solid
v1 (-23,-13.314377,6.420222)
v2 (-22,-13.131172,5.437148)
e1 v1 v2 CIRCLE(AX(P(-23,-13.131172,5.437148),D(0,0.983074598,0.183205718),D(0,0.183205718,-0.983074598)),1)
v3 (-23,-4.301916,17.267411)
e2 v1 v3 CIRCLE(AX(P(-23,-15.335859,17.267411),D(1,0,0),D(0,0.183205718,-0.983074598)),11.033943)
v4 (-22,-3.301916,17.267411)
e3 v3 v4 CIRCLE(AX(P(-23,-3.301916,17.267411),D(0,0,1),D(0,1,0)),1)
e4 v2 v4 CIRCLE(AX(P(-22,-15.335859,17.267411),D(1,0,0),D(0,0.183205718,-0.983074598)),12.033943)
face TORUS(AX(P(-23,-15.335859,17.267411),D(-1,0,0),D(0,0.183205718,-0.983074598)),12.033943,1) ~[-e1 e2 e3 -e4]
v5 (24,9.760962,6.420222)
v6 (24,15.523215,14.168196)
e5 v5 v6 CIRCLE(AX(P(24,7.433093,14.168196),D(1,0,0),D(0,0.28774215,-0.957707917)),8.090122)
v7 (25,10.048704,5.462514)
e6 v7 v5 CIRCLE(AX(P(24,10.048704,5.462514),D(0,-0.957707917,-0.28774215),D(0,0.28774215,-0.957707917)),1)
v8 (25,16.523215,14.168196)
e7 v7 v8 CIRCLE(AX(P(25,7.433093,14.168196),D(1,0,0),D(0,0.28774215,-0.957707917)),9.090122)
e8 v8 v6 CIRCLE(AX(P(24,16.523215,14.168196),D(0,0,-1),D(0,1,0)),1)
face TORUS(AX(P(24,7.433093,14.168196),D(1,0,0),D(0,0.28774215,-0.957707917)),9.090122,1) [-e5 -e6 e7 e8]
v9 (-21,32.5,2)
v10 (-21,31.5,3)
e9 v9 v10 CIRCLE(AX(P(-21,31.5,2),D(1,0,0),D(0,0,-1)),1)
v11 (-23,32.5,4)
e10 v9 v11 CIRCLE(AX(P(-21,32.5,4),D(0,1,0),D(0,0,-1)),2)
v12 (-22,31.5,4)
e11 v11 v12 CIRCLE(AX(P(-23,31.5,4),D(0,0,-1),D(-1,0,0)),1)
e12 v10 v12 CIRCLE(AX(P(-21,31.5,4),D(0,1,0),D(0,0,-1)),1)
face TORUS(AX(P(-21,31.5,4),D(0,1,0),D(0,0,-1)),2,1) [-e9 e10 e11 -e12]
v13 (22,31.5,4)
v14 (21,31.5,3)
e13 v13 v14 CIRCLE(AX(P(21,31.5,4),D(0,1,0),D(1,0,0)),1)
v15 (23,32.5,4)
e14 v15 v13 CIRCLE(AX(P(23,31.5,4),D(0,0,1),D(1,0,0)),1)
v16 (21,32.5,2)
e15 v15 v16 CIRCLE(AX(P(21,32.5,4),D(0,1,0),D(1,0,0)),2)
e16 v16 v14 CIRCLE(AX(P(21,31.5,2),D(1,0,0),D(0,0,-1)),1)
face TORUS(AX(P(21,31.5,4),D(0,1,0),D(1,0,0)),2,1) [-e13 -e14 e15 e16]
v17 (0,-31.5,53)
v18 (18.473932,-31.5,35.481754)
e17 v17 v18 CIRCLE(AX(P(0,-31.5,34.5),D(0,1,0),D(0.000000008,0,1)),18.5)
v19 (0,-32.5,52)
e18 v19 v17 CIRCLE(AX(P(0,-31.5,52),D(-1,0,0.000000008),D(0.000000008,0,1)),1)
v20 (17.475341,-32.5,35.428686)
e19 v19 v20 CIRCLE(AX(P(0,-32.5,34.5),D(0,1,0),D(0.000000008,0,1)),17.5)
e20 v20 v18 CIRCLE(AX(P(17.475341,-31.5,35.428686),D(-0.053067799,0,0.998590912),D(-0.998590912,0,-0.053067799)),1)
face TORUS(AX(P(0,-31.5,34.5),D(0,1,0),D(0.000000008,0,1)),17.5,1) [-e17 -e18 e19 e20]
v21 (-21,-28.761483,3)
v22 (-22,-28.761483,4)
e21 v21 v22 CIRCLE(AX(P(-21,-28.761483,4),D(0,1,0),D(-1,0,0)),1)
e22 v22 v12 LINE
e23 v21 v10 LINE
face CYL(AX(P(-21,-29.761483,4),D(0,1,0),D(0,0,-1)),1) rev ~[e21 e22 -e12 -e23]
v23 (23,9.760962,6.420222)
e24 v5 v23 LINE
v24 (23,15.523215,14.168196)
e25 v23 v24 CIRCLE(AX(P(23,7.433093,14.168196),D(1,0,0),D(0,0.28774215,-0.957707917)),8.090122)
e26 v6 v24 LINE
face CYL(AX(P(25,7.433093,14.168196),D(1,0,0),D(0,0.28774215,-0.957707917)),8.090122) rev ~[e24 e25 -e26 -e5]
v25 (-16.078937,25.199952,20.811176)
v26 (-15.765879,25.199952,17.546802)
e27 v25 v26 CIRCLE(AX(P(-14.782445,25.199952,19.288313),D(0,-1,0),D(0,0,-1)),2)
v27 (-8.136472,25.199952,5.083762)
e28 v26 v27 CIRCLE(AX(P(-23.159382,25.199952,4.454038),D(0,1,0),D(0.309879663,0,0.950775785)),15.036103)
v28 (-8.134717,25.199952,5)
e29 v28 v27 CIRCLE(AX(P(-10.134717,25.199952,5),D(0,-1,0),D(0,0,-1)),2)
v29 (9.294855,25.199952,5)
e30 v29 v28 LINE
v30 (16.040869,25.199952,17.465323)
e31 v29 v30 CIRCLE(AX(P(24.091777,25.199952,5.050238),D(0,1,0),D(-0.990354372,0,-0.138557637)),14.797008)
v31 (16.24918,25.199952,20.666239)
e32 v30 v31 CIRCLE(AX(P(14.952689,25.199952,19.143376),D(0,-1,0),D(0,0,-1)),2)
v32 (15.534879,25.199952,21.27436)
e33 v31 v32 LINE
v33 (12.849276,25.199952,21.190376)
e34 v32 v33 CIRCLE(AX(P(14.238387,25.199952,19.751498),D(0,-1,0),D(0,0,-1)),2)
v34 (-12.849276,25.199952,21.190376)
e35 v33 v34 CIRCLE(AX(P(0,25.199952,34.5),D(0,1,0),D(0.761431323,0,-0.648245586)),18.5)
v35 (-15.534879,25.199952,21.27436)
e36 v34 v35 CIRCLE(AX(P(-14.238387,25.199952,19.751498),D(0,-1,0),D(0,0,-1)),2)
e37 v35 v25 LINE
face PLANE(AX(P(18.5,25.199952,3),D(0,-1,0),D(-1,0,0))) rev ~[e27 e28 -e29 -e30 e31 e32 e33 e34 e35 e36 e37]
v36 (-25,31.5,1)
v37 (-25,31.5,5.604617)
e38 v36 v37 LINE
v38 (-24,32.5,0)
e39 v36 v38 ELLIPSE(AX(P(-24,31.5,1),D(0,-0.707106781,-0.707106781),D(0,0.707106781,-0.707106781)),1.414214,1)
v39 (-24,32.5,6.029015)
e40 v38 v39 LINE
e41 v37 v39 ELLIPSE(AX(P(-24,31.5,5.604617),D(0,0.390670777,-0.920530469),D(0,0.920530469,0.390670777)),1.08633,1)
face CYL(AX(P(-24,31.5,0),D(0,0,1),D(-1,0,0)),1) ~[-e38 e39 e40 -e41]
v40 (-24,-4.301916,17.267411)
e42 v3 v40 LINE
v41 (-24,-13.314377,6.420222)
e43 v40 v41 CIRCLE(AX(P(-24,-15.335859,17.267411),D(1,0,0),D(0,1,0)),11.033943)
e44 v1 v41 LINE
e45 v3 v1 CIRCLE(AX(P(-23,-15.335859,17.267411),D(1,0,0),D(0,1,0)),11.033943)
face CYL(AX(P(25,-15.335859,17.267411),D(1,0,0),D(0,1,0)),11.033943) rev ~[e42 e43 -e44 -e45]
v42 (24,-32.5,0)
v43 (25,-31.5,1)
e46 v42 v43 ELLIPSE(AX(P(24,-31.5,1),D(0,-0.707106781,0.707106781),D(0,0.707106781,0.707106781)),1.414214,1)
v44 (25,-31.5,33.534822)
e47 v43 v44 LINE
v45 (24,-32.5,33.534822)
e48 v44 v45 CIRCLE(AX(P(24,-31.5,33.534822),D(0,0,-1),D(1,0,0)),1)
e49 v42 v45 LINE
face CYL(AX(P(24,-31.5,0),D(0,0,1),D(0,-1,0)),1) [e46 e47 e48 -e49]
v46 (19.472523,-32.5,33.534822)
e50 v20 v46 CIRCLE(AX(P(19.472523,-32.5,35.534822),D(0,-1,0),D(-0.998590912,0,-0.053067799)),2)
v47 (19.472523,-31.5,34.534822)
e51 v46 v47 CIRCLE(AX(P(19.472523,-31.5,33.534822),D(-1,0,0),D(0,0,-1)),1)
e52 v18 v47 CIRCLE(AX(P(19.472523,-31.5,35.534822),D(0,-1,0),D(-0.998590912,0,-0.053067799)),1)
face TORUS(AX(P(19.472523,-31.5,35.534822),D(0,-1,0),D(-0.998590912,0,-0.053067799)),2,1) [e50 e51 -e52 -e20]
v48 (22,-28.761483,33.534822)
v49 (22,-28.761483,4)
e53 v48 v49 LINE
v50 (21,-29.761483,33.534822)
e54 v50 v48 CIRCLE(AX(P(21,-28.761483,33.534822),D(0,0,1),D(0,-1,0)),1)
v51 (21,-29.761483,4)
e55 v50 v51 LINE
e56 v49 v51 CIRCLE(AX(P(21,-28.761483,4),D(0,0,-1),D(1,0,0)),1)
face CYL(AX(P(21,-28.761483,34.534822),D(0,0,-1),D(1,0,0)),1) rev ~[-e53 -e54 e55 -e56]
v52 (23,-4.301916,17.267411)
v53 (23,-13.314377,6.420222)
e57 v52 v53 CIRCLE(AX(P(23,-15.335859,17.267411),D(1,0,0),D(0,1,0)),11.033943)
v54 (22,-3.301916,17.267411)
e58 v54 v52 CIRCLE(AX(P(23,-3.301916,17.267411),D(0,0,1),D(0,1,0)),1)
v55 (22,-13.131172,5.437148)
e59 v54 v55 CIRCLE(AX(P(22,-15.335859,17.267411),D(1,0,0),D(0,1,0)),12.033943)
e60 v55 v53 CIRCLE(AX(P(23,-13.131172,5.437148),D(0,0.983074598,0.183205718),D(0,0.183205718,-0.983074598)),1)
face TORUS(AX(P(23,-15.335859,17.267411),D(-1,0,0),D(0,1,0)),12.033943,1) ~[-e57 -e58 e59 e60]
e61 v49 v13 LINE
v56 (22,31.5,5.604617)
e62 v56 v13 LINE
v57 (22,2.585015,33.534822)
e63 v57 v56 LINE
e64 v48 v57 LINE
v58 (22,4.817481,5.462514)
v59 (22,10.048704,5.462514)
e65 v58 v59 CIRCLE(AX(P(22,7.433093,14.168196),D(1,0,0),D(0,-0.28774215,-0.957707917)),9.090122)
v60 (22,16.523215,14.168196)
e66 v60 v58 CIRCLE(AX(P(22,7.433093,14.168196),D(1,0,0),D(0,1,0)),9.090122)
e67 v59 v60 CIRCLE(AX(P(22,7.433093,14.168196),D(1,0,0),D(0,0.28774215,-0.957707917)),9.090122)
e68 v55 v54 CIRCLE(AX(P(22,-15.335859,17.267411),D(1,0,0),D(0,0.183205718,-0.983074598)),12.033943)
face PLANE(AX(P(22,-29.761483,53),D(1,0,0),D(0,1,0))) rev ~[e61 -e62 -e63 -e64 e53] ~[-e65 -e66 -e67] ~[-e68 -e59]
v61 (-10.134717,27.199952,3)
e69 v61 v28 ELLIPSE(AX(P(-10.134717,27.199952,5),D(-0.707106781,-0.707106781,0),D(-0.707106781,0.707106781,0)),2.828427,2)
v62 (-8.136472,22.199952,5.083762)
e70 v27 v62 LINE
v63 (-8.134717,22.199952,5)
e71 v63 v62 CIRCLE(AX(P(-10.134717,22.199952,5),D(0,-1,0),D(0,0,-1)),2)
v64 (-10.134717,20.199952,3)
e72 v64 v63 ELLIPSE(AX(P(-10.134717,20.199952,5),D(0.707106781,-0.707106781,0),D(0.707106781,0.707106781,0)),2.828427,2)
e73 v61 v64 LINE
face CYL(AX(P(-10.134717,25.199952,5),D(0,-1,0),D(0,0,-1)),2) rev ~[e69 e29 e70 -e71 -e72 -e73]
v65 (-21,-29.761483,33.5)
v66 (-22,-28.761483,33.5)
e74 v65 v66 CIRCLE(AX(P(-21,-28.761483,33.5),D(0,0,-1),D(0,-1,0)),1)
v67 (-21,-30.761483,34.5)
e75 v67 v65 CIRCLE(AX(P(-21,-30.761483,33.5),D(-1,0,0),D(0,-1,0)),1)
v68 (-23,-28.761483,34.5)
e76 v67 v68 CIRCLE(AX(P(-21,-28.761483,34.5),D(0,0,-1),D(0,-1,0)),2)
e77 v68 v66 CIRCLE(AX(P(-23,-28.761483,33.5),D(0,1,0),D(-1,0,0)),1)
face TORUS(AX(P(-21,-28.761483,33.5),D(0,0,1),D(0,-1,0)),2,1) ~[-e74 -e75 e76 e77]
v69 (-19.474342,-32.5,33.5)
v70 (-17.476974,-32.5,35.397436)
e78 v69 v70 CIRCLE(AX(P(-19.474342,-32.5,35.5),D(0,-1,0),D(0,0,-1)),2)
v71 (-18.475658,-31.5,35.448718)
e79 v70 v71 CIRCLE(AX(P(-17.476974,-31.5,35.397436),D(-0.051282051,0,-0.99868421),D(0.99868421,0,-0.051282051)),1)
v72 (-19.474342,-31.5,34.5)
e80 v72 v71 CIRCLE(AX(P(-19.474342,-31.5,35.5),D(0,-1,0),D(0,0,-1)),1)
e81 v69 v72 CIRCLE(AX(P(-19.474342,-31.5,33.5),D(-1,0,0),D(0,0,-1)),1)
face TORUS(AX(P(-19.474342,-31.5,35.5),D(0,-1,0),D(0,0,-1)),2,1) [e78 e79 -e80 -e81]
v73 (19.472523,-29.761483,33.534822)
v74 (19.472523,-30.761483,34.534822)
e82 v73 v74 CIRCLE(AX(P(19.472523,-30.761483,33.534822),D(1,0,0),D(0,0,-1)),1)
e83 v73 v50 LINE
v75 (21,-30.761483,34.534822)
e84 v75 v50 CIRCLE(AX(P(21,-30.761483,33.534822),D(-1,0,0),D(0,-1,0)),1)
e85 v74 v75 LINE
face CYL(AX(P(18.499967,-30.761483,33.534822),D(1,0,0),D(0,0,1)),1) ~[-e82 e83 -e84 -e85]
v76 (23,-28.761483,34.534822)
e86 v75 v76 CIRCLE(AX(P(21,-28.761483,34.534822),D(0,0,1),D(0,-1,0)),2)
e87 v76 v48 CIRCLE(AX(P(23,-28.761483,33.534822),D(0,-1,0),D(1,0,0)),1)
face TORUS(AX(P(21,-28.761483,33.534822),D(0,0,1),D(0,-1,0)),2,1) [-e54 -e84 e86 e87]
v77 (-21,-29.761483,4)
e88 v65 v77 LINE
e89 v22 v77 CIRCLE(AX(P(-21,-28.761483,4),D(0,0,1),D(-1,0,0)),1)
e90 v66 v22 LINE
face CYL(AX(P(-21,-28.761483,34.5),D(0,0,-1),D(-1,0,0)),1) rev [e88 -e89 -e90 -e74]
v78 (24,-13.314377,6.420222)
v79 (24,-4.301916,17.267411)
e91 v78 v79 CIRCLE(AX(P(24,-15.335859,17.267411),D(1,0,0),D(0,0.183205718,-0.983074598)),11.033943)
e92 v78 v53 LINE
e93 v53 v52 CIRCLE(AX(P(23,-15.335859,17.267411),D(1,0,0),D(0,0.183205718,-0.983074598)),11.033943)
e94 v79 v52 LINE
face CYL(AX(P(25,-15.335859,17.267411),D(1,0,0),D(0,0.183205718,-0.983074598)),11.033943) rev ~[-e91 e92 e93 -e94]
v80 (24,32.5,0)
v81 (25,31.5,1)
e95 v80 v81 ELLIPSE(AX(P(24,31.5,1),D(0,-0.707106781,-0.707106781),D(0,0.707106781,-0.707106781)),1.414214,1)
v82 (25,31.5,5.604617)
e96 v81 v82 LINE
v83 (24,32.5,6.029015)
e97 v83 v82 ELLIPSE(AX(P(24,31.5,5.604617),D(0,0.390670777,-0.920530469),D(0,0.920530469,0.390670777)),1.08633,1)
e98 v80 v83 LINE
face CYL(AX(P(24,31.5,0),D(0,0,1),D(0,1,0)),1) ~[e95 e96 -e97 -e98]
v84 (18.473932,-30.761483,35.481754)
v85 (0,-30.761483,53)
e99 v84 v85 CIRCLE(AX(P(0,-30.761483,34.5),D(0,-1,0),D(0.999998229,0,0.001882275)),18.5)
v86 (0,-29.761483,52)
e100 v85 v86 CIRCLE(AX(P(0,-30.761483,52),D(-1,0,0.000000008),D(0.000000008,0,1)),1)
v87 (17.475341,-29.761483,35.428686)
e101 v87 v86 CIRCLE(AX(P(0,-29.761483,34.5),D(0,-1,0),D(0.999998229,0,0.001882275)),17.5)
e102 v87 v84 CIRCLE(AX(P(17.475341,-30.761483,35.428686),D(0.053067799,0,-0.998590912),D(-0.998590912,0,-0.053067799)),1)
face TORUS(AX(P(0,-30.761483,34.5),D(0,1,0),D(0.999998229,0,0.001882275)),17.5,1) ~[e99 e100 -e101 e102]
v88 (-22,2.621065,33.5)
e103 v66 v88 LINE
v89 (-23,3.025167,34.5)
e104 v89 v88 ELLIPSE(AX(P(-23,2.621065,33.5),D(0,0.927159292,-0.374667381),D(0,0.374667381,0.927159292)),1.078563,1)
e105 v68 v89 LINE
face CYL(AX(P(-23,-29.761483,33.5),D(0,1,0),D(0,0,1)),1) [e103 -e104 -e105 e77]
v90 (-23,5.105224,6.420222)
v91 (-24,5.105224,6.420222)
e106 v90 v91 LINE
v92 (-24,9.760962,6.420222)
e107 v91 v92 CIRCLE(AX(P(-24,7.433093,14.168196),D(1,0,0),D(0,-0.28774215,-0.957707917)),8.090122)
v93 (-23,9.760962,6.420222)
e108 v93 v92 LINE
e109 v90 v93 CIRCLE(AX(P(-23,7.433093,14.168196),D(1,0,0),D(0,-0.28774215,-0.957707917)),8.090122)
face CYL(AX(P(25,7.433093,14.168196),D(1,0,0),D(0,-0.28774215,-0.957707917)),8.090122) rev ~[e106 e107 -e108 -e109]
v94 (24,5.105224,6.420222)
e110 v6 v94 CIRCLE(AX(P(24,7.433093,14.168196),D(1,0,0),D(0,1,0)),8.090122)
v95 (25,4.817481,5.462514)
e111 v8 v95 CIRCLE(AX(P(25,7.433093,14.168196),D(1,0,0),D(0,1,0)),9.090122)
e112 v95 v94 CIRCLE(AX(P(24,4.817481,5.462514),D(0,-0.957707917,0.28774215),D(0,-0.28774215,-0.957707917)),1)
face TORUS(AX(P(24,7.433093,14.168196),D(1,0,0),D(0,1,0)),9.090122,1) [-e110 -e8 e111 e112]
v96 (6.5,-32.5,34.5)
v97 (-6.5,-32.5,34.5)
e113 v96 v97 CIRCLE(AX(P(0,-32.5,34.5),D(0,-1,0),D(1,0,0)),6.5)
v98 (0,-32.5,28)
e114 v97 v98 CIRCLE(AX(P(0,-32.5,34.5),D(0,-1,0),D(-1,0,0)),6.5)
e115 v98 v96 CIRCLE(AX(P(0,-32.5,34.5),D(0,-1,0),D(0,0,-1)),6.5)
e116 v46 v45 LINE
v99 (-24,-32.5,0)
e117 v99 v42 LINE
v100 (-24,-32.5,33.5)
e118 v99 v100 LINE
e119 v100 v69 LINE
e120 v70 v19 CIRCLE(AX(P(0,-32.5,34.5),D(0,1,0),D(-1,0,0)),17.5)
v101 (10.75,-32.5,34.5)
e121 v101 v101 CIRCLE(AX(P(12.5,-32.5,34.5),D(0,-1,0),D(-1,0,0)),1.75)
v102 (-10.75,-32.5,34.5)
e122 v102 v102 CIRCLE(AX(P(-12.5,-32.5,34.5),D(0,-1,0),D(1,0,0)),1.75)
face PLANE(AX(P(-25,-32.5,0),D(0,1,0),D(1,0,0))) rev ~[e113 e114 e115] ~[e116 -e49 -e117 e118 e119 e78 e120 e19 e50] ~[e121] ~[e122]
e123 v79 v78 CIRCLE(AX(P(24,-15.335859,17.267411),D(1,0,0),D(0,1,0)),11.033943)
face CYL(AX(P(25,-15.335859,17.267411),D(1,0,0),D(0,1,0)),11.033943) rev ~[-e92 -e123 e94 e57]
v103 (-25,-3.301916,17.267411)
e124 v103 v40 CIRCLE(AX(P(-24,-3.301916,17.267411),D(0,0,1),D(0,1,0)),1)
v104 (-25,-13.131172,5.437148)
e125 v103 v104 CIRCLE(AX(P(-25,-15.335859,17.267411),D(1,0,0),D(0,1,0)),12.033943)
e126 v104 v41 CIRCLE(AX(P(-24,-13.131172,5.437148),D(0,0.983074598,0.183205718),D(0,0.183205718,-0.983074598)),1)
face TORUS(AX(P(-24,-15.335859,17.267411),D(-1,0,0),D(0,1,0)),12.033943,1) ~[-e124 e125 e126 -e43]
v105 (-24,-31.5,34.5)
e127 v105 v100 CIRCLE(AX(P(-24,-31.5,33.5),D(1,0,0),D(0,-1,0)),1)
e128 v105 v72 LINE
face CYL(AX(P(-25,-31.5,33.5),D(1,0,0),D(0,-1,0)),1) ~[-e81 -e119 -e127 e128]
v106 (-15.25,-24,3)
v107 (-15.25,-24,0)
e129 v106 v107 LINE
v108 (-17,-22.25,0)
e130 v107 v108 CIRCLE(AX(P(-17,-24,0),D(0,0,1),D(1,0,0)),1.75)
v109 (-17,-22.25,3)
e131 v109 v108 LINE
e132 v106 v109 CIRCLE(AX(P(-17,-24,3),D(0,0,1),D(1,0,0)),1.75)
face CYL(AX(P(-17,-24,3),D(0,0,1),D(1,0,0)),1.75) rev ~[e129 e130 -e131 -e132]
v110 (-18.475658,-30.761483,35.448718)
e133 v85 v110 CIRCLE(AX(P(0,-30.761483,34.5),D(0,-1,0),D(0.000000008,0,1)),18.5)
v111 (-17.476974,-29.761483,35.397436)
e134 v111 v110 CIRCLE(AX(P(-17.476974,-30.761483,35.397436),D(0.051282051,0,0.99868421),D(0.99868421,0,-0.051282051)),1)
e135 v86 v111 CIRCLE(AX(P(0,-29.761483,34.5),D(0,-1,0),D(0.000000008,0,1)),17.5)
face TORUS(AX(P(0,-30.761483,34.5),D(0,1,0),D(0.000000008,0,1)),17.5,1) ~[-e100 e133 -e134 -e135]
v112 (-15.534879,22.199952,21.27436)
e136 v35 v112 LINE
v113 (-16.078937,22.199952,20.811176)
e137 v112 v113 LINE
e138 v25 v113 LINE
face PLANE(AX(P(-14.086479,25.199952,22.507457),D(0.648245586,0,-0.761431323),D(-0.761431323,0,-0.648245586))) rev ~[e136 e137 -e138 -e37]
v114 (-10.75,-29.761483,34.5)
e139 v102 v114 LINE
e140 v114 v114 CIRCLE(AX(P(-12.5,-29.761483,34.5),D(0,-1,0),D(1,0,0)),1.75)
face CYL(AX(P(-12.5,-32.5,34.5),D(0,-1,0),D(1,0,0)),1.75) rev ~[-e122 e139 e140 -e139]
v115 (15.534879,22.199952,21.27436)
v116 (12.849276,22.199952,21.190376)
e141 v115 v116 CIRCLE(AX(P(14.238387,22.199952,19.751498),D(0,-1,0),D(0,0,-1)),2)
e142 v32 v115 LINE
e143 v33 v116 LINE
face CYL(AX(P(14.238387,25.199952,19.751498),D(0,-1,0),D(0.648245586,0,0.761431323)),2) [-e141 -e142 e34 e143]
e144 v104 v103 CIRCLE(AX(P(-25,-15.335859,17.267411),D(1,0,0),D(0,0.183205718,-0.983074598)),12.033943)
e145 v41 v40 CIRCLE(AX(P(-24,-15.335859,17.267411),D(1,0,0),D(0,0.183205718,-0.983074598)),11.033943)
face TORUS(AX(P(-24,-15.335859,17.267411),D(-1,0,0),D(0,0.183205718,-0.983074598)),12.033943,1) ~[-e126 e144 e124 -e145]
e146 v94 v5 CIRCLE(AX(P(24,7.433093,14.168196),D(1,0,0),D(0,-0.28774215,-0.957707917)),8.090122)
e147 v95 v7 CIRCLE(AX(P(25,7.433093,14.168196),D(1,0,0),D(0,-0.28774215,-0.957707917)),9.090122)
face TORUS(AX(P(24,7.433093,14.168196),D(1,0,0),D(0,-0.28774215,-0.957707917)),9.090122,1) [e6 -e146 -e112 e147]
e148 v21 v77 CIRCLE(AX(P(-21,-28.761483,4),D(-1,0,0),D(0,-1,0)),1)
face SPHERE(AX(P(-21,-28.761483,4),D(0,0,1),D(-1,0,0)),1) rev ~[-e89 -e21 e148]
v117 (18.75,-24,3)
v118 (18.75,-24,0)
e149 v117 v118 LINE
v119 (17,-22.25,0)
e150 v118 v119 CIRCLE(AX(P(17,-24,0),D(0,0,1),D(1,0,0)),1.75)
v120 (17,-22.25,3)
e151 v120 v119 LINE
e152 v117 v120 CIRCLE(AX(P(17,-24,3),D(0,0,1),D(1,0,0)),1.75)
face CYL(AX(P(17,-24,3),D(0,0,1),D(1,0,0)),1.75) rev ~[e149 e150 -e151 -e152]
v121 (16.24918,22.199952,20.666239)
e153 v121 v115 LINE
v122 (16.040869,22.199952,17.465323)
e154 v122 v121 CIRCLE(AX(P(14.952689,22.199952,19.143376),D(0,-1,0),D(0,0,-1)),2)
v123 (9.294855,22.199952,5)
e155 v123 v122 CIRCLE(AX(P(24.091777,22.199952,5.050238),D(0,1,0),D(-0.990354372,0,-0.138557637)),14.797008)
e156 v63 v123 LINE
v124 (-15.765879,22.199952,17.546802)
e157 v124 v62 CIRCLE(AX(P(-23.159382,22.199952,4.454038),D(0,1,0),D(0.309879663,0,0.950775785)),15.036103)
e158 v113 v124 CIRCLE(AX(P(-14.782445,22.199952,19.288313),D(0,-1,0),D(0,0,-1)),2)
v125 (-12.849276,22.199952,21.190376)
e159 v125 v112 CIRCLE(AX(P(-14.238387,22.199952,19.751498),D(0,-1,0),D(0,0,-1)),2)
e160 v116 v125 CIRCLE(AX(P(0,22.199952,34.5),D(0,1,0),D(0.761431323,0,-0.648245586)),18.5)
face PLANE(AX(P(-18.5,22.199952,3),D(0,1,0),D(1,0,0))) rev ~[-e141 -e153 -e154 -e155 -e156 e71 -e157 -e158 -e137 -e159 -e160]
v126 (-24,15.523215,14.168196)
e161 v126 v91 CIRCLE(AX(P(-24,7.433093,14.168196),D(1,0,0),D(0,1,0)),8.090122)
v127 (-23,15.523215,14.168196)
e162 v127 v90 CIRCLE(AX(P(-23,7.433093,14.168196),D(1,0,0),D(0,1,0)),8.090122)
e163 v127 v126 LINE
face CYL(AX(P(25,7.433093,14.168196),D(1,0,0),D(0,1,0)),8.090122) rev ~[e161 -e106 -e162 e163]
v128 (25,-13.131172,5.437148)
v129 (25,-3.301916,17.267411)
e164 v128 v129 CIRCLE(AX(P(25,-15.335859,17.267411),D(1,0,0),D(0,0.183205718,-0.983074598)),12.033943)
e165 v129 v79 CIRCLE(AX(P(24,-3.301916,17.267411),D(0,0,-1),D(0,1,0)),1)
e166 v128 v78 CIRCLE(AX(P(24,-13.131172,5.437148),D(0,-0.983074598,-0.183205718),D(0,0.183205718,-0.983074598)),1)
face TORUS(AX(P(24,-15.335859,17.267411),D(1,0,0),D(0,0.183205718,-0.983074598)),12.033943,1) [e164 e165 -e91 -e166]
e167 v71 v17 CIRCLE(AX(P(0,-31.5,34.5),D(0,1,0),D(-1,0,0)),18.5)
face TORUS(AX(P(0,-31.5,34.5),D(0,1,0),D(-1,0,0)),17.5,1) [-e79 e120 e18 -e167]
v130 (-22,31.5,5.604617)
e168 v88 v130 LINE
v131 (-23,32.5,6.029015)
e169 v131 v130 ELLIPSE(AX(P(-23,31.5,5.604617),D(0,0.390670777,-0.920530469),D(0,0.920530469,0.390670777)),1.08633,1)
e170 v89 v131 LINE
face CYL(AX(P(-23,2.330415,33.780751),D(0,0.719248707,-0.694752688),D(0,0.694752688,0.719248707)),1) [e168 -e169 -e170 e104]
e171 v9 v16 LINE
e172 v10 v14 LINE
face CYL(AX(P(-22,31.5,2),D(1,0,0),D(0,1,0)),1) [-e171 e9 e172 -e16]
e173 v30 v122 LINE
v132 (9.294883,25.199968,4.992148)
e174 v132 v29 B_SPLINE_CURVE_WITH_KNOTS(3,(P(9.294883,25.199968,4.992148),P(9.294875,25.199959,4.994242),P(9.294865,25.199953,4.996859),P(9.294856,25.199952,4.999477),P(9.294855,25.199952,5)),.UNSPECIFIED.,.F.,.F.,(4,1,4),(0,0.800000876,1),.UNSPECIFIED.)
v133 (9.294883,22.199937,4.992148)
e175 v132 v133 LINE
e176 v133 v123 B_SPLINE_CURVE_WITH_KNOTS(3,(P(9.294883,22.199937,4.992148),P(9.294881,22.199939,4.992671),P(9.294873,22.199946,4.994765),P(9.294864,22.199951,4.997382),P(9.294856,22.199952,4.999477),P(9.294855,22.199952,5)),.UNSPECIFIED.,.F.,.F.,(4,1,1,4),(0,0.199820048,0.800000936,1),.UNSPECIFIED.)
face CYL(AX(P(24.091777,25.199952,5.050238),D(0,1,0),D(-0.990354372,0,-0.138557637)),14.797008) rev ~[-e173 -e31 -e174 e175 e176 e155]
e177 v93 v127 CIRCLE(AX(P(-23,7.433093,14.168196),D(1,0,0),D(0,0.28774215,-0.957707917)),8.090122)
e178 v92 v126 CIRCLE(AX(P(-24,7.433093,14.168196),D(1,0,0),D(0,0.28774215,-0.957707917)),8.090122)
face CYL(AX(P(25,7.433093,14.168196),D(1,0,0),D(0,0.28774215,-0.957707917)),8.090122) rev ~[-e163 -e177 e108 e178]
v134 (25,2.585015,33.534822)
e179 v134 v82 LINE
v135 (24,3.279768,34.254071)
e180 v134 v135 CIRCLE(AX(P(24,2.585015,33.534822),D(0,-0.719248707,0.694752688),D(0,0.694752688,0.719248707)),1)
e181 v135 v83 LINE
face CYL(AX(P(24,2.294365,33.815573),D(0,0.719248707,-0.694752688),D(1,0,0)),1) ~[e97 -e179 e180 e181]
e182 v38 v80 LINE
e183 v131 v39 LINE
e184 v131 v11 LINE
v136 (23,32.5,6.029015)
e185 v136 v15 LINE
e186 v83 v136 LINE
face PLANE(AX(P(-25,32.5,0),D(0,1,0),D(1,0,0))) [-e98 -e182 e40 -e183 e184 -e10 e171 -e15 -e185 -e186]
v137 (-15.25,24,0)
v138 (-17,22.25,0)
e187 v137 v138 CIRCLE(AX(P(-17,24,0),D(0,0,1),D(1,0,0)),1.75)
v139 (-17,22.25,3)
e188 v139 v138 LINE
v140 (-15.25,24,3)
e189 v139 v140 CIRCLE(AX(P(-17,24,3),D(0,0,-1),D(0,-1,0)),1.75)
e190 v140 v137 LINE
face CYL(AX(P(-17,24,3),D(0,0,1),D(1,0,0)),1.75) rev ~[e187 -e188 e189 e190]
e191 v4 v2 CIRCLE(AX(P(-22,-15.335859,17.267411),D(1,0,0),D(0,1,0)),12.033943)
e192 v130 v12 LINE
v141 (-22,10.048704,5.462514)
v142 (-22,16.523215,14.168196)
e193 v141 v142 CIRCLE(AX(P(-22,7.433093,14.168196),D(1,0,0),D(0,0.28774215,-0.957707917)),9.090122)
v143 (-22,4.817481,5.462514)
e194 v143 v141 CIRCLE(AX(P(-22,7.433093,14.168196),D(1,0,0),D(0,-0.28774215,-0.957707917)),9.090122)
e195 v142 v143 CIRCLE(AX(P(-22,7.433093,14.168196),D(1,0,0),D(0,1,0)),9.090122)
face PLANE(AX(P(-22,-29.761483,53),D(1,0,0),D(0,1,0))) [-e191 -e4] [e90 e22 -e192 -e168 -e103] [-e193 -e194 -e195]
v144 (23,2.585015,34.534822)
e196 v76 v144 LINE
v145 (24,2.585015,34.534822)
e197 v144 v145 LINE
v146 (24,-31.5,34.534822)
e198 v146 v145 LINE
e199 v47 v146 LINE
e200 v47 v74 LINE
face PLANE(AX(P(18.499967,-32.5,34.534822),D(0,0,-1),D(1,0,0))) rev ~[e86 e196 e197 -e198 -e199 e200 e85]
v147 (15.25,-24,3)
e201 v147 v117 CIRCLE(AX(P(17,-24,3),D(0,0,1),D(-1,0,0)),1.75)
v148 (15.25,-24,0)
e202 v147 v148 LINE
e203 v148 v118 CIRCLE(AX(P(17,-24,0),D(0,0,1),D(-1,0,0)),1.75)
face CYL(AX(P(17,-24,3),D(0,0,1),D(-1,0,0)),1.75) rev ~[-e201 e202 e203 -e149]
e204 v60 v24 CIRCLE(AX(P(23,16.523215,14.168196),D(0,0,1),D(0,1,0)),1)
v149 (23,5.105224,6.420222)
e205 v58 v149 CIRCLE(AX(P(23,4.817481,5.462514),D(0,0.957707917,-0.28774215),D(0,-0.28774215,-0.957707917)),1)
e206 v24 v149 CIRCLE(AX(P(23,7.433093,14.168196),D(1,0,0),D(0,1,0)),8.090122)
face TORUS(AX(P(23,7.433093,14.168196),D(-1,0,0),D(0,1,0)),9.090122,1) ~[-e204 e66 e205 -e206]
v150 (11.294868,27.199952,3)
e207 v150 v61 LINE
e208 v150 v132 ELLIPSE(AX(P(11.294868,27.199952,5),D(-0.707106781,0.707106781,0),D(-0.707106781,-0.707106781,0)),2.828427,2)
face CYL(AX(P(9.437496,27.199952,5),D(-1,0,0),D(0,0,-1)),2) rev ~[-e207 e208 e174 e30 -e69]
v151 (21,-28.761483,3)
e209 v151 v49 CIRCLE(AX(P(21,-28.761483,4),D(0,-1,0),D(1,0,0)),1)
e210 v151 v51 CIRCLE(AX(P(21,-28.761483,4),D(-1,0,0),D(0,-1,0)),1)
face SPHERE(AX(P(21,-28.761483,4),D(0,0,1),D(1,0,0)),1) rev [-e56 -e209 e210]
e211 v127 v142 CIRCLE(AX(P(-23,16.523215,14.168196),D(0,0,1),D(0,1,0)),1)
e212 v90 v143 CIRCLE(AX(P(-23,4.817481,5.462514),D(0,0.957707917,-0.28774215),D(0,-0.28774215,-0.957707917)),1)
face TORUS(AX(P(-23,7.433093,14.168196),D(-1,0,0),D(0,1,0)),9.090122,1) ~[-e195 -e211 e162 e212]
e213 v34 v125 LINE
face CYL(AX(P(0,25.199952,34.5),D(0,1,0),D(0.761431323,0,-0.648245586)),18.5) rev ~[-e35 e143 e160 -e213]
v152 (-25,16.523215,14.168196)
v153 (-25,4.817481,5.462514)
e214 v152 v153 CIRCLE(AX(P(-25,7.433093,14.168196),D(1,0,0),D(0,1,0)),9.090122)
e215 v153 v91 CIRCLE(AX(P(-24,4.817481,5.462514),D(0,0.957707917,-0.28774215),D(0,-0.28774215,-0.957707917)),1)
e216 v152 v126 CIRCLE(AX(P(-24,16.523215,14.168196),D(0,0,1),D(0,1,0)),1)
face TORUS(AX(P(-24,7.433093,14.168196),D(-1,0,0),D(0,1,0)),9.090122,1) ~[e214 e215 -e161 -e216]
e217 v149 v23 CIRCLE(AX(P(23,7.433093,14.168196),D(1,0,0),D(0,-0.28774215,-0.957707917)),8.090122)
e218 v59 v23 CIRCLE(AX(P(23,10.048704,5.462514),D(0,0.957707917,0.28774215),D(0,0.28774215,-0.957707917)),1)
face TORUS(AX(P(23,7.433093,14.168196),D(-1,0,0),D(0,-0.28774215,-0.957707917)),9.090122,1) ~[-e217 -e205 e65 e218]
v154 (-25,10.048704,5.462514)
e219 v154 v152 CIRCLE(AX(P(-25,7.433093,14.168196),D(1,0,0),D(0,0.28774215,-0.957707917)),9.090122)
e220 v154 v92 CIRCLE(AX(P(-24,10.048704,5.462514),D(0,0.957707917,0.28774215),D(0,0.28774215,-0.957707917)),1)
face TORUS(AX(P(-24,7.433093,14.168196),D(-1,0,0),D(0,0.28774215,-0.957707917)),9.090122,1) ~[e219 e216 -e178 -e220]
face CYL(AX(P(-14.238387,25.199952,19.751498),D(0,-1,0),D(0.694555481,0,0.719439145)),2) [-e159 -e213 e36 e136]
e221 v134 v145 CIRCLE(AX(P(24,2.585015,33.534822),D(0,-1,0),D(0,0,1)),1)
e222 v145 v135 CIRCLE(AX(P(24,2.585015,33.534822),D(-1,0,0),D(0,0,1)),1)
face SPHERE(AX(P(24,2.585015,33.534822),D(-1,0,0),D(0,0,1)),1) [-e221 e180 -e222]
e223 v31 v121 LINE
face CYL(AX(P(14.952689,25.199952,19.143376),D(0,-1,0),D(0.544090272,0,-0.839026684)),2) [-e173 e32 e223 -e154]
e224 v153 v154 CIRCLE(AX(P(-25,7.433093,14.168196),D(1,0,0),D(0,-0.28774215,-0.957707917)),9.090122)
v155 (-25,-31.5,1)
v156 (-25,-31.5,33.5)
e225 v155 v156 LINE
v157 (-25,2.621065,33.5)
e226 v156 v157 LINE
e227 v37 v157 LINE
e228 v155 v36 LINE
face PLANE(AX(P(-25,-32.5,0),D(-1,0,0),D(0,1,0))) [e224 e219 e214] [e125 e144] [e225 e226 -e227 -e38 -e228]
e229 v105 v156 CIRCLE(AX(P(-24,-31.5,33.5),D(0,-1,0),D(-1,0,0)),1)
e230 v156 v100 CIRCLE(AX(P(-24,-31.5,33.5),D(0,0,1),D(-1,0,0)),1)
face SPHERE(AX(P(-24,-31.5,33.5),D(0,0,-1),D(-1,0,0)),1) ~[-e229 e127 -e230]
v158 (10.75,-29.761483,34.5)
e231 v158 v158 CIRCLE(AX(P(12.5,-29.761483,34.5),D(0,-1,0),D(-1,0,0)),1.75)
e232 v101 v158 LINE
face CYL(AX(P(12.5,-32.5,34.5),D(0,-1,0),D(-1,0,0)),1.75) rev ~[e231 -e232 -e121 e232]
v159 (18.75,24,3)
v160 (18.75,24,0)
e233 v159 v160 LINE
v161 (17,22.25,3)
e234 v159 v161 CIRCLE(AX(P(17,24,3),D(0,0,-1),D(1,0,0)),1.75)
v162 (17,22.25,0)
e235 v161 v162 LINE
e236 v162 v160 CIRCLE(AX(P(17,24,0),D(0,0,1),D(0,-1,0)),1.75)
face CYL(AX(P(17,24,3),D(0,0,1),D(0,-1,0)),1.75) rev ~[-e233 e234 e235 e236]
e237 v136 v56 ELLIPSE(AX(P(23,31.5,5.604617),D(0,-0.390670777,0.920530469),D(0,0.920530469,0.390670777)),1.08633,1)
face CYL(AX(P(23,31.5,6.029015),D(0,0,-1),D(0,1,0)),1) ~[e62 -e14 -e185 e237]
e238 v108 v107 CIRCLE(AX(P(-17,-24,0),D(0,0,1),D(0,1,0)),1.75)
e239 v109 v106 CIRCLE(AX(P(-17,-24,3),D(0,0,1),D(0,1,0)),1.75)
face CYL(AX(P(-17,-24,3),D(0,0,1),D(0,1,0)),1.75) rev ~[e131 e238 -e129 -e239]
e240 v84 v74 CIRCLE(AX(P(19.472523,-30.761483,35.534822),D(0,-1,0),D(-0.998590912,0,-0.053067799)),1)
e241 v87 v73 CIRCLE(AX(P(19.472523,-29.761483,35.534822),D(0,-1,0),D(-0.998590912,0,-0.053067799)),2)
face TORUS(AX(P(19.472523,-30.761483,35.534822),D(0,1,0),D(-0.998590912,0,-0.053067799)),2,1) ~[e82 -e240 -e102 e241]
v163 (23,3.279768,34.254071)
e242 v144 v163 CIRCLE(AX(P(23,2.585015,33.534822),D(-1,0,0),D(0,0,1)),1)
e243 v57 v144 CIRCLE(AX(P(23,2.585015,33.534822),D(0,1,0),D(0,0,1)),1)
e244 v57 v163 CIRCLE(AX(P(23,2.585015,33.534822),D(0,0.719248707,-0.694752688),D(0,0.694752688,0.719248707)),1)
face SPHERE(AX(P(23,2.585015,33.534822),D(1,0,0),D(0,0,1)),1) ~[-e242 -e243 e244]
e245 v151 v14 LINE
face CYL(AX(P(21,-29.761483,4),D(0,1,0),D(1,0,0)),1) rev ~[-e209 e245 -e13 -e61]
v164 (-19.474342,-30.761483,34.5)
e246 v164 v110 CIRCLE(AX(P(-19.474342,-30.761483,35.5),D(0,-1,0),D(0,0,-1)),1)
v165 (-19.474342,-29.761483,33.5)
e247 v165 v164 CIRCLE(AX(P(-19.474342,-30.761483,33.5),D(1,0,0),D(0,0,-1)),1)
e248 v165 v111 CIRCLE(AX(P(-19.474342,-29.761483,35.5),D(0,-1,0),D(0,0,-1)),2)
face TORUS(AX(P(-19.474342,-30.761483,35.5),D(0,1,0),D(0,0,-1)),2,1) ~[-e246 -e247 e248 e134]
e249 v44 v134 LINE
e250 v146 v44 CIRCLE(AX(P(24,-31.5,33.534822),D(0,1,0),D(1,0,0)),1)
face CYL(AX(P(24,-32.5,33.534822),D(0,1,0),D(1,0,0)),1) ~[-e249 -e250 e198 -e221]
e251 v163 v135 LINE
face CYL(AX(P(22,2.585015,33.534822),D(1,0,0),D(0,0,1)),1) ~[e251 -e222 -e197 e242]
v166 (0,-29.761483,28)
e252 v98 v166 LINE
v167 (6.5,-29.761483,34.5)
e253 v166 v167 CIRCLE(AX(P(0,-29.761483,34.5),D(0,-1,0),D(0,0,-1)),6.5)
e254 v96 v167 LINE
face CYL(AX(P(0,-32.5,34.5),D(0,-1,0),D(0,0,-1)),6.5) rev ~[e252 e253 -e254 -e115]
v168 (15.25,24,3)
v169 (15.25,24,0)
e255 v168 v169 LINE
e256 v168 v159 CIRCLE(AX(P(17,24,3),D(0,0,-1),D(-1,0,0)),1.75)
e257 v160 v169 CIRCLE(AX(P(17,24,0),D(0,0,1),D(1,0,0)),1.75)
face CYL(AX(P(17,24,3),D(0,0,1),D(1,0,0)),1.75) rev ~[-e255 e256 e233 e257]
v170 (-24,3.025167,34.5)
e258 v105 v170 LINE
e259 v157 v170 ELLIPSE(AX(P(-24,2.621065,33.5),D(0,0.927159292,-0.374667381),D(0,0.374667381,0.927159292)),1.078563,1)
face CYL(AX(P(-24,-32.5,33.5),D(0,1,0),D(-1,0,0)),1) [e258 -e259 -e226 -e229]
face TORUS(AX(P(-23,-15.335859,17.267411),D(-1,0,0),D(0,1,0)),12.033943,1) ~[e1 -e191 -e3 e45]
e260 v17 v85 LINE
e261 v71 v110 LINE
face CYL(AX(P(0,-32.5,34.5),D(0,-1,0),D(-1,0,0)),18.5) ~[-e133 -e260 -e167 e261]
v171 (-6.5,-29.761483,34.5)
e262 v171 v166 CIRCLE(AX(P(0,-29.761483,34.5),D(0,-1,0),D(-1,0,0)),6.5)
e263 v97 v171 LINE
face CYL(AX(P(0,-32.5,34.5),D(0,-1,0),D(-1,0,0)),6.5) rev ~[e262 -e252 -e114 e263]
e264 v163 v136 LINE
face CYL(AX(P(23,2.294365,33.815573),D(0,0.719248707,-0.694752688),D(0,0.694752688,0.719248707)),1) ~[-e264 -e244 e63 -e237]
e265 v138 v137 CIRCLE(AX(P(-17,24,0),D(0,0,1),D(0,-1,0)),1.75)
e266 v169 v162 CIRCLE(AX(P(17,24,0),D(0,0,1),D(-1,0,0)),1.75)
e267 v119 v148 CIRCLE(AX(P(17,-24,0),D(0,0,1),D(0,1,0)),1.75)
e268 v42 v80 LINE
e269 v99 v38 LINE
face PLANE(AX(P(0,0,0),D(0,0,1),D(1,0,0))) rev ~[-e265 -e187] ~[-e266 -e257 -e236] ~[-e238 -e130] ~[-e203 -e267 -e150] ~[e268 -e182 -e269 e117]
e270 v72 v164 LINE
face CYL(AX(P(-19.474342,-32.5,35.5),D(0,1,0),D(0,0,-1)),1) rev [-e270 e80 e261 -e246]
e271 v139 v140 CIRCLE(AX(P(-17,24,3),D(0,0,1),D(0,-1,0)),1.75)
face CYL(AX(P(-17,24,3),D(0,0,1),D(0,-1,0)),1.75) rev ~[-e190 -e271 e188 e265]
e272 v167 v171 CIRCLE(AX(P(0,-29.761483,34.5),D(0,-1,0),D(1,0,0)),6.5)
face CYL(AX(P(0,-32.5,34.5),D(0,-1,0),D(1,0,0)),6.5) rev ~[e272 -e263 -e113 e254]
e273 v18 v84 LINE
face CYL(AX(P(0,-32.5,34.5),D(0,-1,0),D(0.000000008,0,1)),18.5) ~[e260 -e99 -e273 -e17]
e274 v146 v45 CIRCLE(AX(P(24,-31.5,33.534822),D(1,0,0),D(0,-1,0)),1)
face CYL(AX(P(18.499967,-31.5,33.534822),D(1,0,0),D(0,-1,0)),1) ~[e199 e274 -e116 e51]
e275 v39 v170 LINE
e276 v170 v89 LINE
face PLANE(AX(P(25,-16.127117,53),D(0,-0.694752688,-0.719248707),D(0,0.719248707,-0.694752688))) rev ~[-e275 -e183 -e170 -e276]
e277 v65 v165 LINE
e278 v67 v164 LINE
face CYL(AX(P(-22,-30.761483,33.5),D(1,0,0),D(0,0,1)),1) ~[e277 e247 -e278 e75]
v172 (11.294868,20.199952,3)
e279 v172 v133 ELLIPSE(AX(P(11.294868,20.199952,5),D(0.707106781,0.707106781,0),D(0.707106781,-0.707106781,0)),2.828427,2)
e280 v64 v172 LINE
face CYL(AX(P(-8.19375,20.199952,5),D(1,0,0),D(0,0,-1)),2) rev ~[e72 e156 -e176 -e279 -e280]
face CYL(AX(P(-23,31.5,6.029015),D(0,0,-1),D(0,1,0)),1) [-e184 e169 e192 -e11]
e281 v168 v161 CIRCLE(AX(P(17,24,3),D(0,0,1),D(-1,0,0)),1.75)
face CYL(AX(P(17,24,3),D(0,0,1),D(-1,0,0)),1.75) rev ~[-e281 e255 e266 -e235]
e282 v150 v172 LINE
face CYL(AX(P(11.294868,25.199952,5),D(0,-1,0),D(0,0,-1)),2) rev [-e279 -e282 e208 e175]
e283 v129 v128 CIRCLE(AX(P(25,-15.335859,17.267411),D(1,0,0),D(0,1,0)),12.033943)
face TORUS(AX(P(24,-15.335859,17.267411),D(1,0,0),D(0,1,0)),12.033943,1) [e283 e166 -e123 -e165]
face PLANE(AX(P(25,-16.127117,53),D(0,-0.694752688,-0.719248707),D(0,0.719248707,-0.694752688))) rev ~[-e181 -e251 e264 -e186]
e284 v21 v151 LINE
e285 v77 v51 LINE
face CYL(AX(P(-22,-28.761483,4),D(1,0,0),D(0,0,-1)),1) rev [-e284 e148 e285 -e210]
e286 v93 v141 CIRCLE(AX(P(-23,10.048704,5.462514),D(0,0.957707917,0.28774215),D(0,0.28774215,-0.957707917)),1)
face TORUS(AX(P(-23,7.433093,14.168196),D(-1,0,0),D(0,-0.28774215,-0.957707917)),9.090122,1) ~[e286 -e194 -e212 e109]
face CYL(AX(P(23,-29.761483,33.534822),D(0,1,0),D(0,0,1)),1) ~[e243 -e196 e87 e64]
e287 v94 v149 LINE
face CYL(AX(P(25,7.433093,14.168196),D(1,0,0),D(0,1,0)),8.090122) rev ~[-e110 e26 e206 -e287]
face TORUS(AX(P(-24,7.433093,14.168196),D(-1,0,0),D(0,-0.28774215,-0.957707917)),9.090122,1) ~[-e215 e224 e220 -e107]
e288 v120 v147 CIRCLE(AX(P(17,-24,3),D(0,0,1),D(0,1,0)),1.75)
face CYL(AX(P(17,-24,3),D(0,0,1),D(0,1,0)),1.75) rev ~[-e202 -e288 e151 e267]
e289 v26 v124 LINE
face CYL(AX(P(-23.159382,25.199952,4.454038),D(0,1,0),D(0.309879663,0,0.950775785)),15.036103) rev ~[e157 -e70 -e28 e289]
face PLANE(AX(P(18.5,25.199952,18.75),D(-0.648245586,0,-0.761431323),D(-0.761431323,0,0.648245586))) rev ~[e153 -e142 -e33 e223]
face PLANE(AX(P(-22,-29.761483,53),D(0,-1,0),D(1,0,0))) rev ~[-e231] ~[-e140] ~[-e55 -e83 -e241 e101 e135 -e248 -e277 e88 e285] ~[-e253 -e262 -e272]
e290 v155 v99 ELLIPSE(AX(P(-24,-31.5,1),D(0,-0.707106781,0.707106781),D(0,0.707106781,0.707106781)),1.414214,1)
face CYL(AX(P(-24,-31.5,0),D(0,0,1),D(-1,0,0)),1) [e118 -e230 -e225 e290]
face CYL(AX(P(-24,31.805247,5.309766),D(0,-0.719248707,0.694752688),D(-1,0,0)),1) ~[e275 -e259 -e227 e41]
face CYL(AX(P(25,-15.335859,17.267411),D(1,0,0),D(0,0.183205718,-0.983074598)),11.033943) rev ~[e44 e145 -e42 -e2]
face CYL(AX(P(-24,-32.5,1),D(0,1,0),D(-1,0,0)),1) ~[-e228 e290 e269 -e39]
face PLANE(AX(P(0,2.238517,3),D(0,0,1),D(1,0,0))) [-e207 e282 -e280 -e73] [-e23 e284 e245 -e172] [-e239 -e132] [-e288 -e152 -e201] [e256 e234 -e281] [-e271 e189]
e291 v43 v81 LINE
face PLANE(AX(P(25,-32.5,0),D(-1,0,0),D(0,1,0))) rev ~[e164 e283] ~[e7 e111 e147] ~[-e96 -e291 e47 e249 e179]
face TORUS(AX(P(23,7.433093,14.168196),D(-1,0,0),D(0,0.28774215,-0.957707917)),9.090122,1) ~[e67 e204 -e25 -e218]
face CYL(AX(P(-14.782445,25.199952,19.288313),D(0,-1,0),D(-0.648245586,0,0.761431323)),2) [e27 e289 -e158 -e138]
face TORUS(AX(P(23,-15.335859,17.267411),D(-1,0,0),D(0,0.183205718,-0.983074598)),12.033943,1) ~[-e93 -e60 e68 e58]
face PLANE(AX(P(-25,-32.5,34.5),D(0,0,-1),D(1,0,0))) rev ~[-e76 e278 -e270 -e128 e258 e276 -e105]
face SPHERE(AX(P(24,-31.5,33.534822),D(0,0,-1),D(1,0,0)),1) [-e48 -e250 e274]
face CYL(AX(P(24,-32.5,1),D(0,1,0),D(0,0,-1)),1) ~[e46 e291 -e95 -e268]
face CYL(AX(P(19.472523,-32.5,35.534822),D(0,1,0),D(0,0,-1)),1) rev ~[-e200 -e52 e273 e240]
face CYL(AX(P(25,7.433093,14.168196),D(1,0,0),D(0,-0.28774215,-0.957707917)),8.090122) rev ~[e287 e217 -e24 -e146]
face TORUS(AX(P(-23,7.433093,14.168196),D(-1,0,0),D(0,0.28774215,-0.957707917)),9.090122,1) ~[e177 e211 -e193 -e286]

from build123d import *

# Parameters (mm, degrees)
F0_W      = 50
F0_H      = 65
F1_DEPTH  = 53
F2_W      = 44
F2_H      = 64
F3_DEPTH  = 50
F5_DEPTH  = 50.8
F6_R      = 1.75
F7_DEPTH  = 46.482
F9_DEPTH  = 51.054
F10_R     = 1
F12_DEPTH = 25.4
F14_DEPTH = 31.5
F16_DEPTH = 25.4
F17_R     = 2


with BuildPart() as f1:
    # F0 (on Top) → F1 (new body)
    with BuildSketch(Plane.XY):
        Rectangle(F0_W, F0_H)
    extrude(amount=F1_DEPTH)

    # F2 (on face) → F3 (cut)
    with BuildSketch(Plane.XY.offset(53)):
        with Locations((0, 2.2385166958)):
            Rectangle(F2_W, F2_H)
    extrude(amount=-F3_DEPTH, mode=Mode.SUBTRACT)

    # F4 (on face) → F5 (cut)
    with BuildSketch(Plane.YZ.offset(25)):
        Polygon((32.5, 53), (-16.1271169782, 53), (32.5, 6.0290149413), align=None)
    extrude(amount=-F5_DEPTH, mode=Mode.SUBTRACT)

    # F6 (on face) → F7 (cut)
    with BuildSketch(Plane.XZ.offset(32.5)):
        with Locations((-12.5, 34.5)):
            Circle(F6_R)
        with BuildLine():
            ThreePointArc((14.25, 34.5), (12.5, 36.25), (10.75, 34.5))
            ThreePointArc((10.75, 34.5), (12.5, 32.75), (14.25, 34.5))
        make_face()
        with BuildLine():
            Line((-6.5, 34.5), (0, 34.5))
            Line((0, 34.5), (6.5, 34.5))
            ThreePointArc((6.5, 34.5), (0, 41), (-6.5, 34.5))
        make_face()
        with BuildLine():
            Line((0, 34.5), (0, 28))
            ThreePointArc((0, 28), (4.5961940777, 29.9038059223), (6.5, 34.5))
            Line((6.5, 34.5), (0, 34.5))
        make_face()
        with BuildLine():
            ThreePointArc((-6.5, 34.5), (-4.5961940777, 29.9038059223), (0, 28))
            Line((0, 28), (0, 34.5))
            Line((0, 34.5), (-6.5, 34.5))
        make_face()
        with BuildLine():
            Line((-25, 34.5), (-18.5, 34.5))
            ThreePointArc((-18.5, 34.5), (-13.0814754005, 47.5814755034), (1.455e-07, 53))
            Line((1.455e-07, 53), (-25, 53))
            Line((-25, 53), (-25, 34.5))
        make_face()
        with BuildLine():
            Line((18.4999672276, 34.5348220845), (25, 34.5348220845))
            Line((25, 34.5348220845), (25, 53))
            Line((25, 53), (1.455e-07, 53))
            ThreePointArc((1.455e-07, 53), (13.0691582386, 47.5937810787), (18.4999672276, 34.5348220845))
        make_face()
    extrude(amount=-F7_DEPTH, mode=Mode.SUBTRACT)

    # F8 (on face) → F9 (cut)
    with BuildSketch(Plane.YZ.offset(25)):
        with BuildLine():
            ThreePointArc((-13.3143774193, 6.4202223538), (-6.8490219642, 10.2160643664), (-4.3019161944, 17.2674110422))
            ThreePointArc((-4.3019161944, 17.2674110422), (-23.8226956348, 24.3187577181), (-13.3143774193, 6.4202223538))
        make_face()
        with BuildLine():
            ThreePointArc((15.5232148034, 14.1681963578), (2.6051878457, 20.6598379602), (5.1052235569, 6.4202223538))
            Line((5.1052235569, 6.4202223538), (9.7609618177, 6.4202223538))
            ThreePointArc((9.7609618177, 6.4202223538), (13.9247342897, 9.3402915162), (15.5232148034, 14.1681963578))
        make_face()
        with BuildLine():
            Line((9.7609618177, 6.4202223538), (5.1052235569, 6.4202223538))
            ThreePointArc((5.1052235569, 6.4202223538), (7.4330926873, 6.0780742416), (9.7609618177, 6.4202223538))
        make_face()
    extrude(amount=-F9_DEPTH, mode=Mode.SUBTRACT)

    # F10
    f10_edges = [f1.edges().sort_by_distance(p)[0] for p in [
        (25, 0, 0),
        (25, -32.5, 17.267411),
        (25, 32.5, 3.014507),
        (25, -14.755441, 34.534822),
        (25, 17.744559, 20.281919),
        (25, -26.369801, 17.267411),
        (25, 9.760962, 21.91617),
        (-22, -13.368158, 34.5),
        (-22, 17.762584, 20.264507),
        (-22, -29.761483, 18.75),
        (-22, 32.5, 4.514507),
        (-22, 1.369258, 3),
        (-22, 9.760962, 21.91617),
        (-22, -26.369801, 17.267411),
        (22, -13.386183, 34.534822),
        (22, -29.761483, 18.767411),
        (22, 17.744559, 20.281919),
        (22, 1.369258, 3),
        (22, 32.5, 4.514507),
        (22, 9.760962, 21.91617),
        (22, -26.369801, 17.267411),
        (-25, 0, 0),
        (-25, 32.5, 3.014507),
        (-25, -32.5, 17.25),
        (-25, 17.762584, 20.264507),
        (-25, -14.737416, 34.5),
        (-25, -26.369801, 17.267411),
        (-25, 9.760962, 21.91617),
        (0, 32.5, 3),
        (0, -29.761483, 3),
        (-0.017411, -29.761483, 52.999992),
        (21.749984, -32.5, 34.534822),
        (23.5, 2.989118, 34.534822),
        (20.249984, -29.761483, 34.534822),
        (18.499967, -31.130742, 34.534822),
        (-21.75, -32.5, 34.5),
        (-0.017411, -32.5, 52.999992),
        (-18.5, -31.130742, 34.5),
        (-20.25, -29.761483, 34.5),
    ]]
    fillet(f10_edges, radius=F10_R)

    # F11 (on face) → F12 (cut)
    with BuildSketch(Plane.XY.offset(3)):
        with BuildLine():
            ThreePointArc((-15.25, 24), (-18.2374368671, 25.2374368671), (-17, 22.25))
            Line((-17, 22.25), (-17, 24))
            Line((-17, 24), (-15.25, 24))
        make_face()
        with BuildLine():
            Line((17, 24), (17, 22.25))
            ThreePointArc((17, 22.25), (18.2374368671, 22.7625631329), (18.75, 24))
            ThreePointArc((18.75, 24), (17, 25.75), (15.25, 24))
            Line((15.25, 24), (17, 24))
        make_face()
        with BuildLine():
            ThreePointArc((15.25, 24), (15.7625631329, 22.7625631329), (17, 22.25))
            Line((17, 22.25), (17, 24))
            Line((17, 24), (15.25, 24))
        make_face()
        with BuildLine():
            Line((-17, 24), (-17, 22.25))
            ThreePointArc((-17, 22.25), (-15.7625631329, 22.7625631329), (-15.25, 24))
            Line((-15.25, 24), (-17, 24))
        make_face()
        with BuildLine():
            Line((17, -24), (15.25, -24))
            ThreePointArc((15.25, -24), (17, -25.75), (18.75, -24))
            ThreePointArc((18.75, -24), (18.2374368671, -22.7625631329), (17, -22.25))
            Line((17, -22.25), (17, -24))
        make_face()
        with BuildLine():
            Line((-15.25, -24), (-17, -24))
            Line((-17, -24), (-17, -22.25))
            ThreePointArc((-17, -22.25), (-18.2374368671, -25.2374368671), (-15.25, -24))
        make_face()
        with BuildLine():
            ThreePointArc((17, -22.25), (15.7625631329, -22.7625631329), (15.25, -24))
            Line((15.25, -24), (17, -24))
            Line((17, -24), (17, -22.25))
        make_face()
        with BuildLine():
            Line((-17, -22.25), (-17, -24))
            Line((-17, -24), (-15.25, -24))
            ThreePointArc((-15.25, -24), (-15.7625631329, -22.7625631329), (-17, -22.25))
        make_face()
    extrude(amount=-F12_DEPTH, mode=Mode.SUBTRACT)

    # F13 (on face) → F14 (join)
    with BuildSketch(Plane.XY.offset(3)):
        Polygon((-18.5, 25.1999522895), (-18.5, 22.1999522895), (0, 22.1999522895), (18.5, 22.1999522895), (18.5, 25.1999522895), align=None)
    extrude(amount=F14_DEPTH)

    # F15 (on face) → F16 (cut)
    with BuildSketch(Plane(origin=(0, 25.1999522895, 0), x_dir=(-1, 0, 0), z_dir=(0, 1, 0))):
        with BuildLine():
            ThreePointArc((14.0864794815, 22.5074566577), (17.3615936827, 28.1105505091), (18.5, 34.5))
            Line((18.5, 34.5), (0, 34.5))
            Line((0, 34.5), (14.0864794815, 22.5074566577))
        make_face()
        with BuildLine():
            Line((0, 34.5), (-18.5, 34.5))
            ThreePointArc((-18.5, 34.5), (-17.3615936827, 28.1105505091), (-14.0864794815, 22.5074566577))
            Line((-14.0864794815, 22.5074566577), (0, 34.5))
        make_face()
        with BuildLine():
            ThreePointArc((-9.4374958426, 3), (-11.266359198, 12.4299466057), (-18.5, 18.75))
            Line((-18.5, 18.75), (-18.5, 3))
            Line((-18.5, 3), (-18.2738188659, 3))
            Line((-18.2738188659, 3), (-15.7261811341, 3))
            Line((-15.7261811341, 3), (-9.4374958426, 3))
        make_face()
        with BuildLine():
            Line((18.5, 3), (18.5, 18.75))
            ThreePointArc((18.5, 18.75), (10.5776127679, 12.6871084903), (8.1937499344, 3))
            Line((8.1937499344, 3), (15.7261811341, 3))
            Line((15.7261811341, 3), (18.2738188659, 3))
            Line((18.2738188659, 3), (18.5, 3))
        make_face()
        with BuildLine():
            ThreePointArc((-14.0864794815, 22.5074566577), (0, 16), (14.0864794815, 22.5074566577))
            Line((14.0864794815, 22.5074566577), (0, 34.5))
            Line((0, 34.5), (-14.0864794815, 22.5074566577))
        make_face()
        with BuildLine():
            Line((18.5, 18.75), (18.5, 34.5))
            ThreePointArc((18.5, 34.5), (17.3615936827, 28.1105505091), (14.0864794815, 22.5074566577))
            Line((14.0864794815, 22.5074566577), (18.5, 18.75))
        make_face()
        with BuildLine():
            ThreePointArc((-14.0864794815, 22.5074566577), (-17.3615936827, 28.1105505091), (-18.5, 34.5))
            Line((-18.5, 34.5), (-18.5, 18.75))
            Line((-18.5, 18.75), (-14.0864794815, 22.5074566577))
        make_face()
    extrude(amount=-F16_DEPTH, mode=Mode.SUBTRACT)

    # F17
    f17_edges = [f1.edges().sort_by_distance(p)[0] for p in [
        (14.086479, 23.699952, 22.507457),
        (-14.086479, 23.699952, 22.507457),
        (9.437496, 23.699952, 3),
        (0.621873, 25.199952, 3),
        (-8.19375, 23.699952, 3),
        (0.621873, 22.199952, 3),
        (18.5, 23.699952, 18.75),
        (-18.5, 23.699952, 18.75),
    ]]
    fillet(f17_edges, radius=F17_R)


solid = f1.part
